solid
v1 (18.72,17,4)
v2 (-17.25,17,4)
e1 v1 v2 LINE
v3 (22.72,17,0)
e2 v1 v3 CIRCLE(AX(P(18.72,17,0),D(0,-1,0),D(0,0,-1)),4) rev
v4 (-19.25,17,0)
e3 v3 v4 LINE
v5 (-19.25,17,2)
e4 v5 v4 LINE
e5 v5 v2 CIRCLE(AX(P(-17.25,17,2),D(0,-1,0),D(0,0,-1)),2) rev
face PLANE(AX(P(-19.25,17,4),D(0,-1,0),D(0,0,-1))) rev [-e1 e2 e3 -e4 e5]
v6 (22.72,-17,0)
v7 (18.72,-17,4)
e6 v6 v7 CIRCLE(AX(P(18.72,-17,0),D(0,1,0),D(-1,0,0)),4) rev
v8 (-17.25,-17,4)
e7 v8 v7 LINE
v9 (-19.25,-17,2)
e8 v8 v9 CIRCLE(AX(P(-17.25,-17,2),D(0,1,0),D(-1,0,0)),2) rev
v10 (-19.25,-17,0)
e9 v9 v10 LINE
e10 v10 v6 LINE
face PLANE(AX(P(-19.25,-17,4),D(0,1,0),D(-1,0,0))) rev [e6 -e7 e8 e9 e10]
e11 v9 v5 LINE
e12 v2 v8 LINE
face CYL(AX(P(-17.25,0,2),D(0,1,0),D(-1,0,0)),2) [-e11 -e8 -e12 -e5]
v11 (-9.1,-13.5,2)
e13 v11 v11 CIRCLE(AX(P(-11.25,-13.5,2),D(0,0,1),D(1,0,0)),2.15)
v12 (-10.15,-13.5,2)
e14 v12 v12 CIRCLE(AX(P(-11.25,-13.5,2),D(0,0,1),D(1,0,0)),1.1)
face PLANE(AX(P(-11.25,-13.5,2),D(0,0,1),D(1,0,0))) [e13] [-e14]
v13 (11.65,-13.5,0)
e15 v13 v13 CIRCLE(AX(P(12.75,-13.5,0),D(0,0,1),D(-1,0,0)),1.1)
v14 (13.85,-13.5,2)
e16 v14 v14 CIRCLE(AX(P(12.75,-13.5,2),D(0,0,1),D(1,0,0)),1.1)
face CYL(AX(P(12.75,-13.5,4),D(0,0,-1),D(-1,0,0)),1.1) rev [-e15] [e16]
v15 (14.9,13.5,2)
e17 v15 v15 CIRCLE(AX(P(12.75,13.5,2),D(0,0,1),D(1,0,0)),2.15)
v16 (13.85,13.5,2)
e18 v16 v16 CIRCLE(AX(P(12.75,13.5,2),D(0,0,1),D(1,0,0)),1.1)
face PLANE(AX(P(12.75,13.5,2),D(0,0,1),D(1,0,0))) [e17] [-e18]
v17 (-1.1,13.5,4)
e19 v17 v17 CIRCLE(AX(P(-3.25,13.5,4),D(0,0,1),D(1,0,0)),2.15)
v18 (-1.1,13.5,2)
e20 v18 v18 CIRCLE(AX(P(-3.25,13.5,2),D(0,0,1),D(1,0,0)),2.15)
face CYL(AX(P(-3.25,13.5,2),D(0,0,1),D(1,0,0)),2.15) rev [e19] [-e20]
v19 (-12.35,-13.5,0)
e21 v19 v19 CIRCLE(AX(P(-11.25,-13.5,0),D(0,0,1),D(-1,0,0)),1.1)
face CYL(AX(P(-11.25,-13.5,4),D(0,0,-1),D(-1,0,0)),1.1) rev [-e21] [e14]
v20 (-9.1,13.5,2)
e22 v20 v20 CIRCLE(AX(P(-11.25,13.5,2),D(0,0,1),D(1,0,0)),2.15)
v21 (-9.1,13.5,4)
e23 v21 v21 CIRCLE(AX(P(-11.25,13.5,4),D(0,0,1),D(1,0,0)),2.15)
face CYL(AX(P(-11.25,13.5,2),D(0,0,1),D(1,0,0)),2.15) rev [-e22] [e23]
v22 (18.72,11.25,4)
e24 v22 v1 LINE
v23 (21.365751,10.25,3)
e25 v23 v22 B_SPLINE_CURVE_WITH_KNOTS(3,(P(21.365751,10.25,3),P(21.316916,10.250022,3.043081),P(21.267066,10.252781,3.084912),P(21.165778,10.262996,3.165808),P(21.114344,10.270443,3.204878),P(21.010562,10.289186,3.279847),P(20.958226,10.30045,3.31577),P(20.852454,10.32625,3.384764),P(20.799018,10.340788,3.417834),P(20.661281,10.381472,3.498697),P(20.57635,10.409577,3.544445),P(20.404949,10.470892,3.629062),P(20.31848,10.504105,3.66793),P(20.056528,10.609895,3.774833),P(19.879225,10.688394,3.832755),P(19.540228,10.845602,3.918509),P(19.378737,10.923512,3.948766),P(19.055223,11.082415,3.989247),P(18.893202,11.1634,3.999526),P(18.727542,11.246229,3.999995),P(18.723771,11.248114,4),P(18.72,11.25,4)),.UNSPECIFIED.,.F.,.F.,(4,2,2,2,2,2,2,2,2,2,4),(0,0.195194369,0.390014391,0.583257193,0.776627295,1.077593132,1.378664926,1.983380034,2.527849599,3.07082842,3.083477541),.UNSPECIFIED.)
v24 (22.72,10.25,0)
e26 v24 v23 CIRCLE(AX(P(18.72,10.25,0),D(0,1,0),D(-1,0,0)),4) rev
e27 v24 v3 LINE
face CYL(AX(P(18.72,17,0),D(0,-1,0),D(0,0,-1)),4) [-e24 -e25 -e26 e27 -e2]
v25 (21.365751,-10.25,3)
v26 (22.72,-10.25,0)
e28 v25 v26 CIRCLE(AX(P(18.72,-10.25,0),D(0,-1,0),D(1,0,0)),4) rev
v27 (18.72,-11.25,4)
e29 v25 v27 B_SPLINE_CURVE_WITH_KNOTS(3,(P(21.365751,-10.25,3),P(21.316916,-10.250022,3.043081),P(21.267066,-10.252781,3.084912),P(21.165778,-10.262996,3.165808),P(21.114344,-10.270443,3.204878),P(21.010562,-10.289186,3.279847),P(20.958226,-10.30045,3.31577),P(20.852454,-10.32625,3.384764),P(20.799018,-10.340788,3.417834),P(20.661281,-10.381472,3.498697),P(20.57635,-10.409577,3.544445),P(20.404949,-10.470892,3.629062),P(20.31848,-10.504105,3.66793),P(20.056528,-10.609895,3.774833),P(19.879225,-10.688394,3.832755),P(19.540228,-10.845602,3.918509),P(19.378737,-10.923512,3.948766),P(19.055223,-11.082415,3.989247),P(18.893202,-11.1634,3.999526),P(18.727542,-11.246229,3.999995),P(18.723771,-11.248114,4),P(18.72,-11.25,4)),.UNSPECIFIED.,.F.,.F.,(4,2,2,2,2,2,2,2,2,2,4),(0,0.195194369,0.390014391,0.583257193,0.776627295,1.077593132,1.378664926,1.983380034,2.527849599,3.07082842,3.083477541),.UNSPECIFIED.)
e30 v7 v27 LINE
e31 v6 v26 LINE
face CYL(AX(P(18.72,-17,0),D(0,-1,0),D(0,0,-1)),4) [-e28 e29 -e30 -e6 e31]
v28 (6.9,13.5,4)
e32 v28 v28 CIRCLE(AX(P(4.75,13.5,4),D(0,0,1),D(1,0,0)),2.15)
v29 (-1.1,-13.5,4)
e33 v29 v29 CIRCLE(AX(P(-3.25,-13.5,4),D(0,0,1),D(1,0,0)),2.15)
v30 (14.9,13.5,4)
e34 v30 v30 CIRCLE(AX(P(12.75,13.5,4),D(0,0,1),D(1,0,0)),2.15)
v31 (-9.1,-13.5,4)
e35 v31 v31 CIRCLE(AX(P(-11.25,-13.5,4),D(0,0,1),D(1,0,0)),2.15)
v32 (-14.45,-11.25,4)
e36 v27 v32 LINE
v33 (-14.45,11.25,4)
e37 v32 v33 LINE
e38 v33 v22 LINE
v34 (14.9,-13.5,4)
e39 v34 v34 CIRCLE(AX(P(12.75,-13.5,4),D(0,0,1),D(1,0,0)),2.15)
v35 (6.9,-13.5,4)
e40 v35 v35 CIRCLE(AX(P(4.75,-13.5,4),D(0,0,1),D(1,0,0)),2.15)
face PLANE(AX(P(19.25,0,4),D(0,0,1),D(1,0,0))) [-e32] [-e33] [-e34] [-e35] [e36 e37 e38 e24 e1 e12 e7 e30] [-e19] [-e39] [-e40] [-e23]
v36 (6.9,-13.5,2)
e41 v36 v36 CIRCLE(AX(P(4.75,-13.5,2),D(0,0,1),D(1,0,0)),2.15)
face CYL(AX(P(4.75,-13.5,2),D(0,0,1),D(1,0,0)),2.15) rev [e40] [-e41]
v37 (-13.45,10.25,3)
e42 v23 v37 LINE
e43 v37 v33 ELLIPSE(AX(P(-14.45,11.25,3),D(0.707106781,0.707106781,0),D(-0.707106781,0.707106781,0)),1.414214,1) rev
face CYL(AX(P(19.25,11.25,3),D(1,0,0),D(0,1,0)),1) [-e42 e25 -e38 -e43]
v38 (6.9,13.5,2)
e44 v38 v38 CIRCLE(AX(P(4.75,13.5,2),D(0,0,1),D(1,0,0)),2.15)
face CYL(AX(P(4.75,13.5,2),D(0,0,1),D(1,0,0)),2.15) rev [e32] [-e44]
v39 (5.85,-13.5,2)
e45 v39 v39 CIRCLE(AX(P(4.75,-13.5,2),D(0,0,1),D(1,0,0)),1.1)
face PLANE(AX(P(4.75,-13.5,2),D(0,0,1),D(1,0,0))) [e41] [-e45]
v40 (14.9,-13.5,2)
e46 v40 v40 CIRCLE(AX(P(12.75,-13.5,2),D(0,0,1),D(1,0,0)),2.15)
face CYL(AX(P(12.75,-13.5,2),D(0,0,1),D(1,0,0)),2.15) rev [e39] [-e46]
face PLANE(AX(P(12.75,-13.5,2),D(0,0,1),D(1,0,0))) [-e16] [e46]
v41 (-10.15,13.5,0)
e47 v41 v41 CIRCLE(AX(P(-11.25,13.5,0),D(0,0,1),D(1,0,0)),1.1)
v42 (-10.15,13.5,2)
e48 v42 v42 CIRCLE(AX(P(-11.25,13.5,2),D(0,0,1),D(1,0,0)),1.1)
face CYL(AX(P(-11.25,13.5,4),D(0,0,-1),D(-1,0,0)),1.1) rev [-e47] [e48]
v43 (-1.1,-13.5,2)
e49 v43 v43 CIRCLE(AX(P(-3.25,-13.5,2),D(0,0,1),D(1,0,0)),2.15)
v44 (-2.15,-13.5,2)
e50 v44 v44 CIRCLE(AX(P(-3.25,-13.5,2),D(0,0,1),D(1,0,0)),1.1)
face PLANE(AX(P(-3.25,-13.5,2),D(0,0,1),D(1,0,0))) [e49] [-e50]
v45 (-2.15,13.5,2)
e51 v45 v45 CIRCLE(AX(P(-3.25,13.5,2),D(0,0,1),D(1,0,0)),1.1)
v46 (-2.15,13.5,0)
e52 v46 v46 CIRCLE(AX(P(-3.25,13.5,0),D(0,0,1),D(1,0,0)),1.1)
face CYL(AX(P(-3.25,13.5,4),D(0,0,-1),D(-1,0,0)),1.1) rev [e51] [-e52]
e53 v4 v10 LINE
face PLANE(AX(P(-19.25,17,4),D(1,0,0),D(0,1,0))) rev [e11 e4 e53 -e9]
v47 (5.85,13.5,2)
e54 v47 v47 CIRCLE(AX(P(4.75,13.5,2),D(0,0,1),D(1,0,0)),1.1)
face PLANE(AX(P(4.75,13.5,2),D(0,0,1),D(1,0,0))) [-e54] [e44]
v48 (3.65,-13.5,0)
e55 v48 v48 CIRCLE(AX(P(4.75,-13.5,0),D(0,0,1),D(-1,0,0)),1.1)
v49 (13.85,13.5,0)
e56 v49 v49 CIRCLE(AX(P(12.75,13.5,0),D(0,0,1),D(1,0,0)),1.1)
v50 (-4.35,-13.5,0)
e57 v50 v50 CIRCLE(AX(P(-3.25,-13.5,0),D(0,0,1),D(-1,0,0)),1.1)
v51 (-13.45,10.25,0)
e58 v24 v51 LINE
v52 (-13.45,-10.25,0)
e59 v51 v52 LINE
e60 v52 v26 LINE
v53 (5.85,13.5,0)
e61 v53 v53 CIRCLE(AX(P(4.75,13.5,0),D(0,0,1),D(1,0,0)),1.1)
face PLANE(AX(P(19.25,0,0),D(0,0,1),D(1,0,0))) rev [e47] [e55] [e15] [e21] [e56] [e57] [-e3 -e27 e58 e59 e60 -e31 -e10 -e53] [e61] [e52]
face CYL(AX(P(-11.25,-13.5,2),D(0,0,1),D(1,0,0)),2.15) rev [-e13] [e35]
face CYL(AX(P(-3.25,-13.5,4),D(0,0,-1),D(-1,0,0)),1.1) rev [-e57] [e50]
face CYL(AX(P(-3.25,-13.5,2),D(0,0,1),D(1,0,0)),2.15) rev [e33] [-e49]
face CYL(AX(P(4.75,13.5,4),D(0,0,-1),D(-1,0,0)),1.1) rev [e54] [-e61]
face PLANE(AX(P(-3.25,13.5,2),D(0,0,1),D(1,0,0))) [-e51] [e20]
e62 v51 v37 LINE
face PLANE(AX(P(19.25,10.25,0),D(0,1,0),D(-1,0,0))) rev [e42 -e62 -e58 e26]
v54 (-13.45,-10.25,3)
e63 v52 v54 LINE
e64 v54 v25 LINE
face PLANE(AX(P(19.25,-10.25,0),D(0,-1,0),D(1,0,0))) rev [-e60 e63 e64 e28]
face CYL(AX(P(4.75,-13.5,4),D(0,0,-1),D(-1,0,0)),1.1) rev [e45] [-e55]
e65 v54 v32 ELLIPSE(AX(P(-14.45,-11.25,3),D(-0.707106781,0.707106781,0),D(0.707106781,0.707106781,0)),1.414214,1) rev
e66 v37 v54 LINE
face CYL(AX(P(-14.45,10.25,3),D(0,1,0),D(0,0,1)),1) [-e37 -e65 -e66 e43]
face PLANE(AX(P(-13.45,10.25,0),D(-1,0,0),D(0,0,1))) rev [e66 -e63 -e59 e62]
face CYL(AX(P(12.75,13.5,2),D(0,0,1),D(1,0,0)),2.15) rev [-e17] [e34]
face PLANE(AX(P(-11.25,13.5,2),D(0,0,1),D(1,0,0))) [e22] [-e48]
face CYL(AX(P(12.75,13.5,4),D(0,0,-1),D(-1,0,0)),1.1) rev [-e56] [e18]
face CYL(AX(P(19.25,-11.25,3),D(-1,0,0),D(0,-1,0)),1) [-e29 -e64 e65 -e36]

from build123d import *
from OCP.BRepFilletAPI import BRepFilletAPI_MakeFillet

# Parameters (mm, degrees)
SKETCH1_R           = 1.1
BOSS_EXTRUDE1_DEPTH = 4
SKETCH2_W           = 32.7
SKETCH2_H           = 20.5
CUT_EXTRUDE1_DEPTH  = 26.991585177
SKETCH3_R           = 2.15
CUT_EXTRUDE2_DEPTH  = 2
SKETCH6_W           = 4
SKETCH6_H           = 6.75
BOSS_EXTRUDE3_DEPTH = 3.47
FILLET1_R           = 4
FILLET1_R_2         = 2
FILLET1_R_3         = 1


with BuildPart() as part:
    # Sketch1 → Boss-Extrude1 (new body)
    with BuildSketch(Plane.XY):
        with BuildLine():
            Line((19.25, 17), (19.25, 5.6))
            ThreePointArc((19.25, 5.6), (13.65, 0), (19.25, -5.6))
            Line((19.25, -5.6), (19.25, -17))
            Line((19.25, -17), (-19.25, -17))
            Line((-19.25, -17), (-19.25, 17))
            Line((-19.25, 17), (19.25, 17))
        make_face()
        with Locations((12.75, 13.5)):
            Circle(SKETCH1_R, mode=Mode.SUBTRACT)
        with Locations((4.75, 13.5)):
            Circle(SKETCH1_R, mode=Mode.SUBTRACT)
        with Locations((-3.25, 13.5)):
            Circle(SKETCH1_R, mode=Mode.SUBTRACT)
        with Locations((-11.25, 13.5)):
            Circle(SKETCH1_R, mode=Mode.SUBTRACT)
        with Locations(Location((-11.25, -13.5, 0), (0, 0, 180))):
            Circle(SKETCH1_R, mode=Mode.SUBTRACT)
        with Locations(Location((-3.25, -13.5, 0), (0, 0, 180))):
            Circle(SKETCH1_R, mode=Mode.SUBTRACT)
        with Locations(Location((4.75, -13.5, 0), (0, 0, 180))):
            Circle(SKETCH1_R, mode=Mode.SUBTRACT)
        with Locations(Location((12.75, -13.5, 0), (0, 0, 180))):
            Circle(SKETCH1_R, mode=Mode.SUBTRACT)
    extrude(amount=BOSS_EXTRUDE1_DEPTH)

    # Sketch2 → Cut-Extrude1 (cut, through all)
    with BuildSketch(Plane.XY.offset(4)):
        with Locations((2.9, 0)):
            Rectangle(SKETCH2_W, SKETCH2_H)
    extrude(amount=-CUT_EXTRUDE1_DEPTH, mode=Mode.SUBTRACT)

    # Sketch3 → Cut-Extrude2 (cut)
    with BuildSketch(Plane.XY.offset(4)):
        with Locations((12.75, 13.5)):
            Circle(SKETCH3_R)
        with Locations((4.75, 13.5)):
            Circle(SKETCH3_R)
        with Locations((-3.25, 13.5)):
            Circle(SKETCH3_R)
        with Locations((-11.25, 13.5)):
            Circle(SKETCH3_R)
        with Locations((12.75, -13.5)):
            Circle(SKETCH3_R)
        with Locations((4.75, -13.5)):
            Circle(SKETCH3_R)
        with Locations((-3.25, -13.5)):
            Circle(SKETCH3_R)
        with Locations((-11.25, -13.5)):
            Circle(SKETCH3_R)
    extrude(amount=-CUT_EXTRUDE2_DEPTH, mode=Mode.SUBTRACT)

    # Sketch6 → Boss-Extrude3 (add)
    with BuildSketch(Plane(origin=(19.25, 0, 0), x_dir=(0, 0, -1), z_dir=(1, 0, 0))):
        with Locations((-2, -13.625)):
            Rectangle(SKETCH6_W, SKETCH6_H)
        with Locations((-2, 13.625)):
            Rectangle(SKETCH6_W, SKETCH6_H)
    extrude(amount=BOSS_EXTRUDE3_DEPTH)

    # Fillet1
    fillet1_edges_1 = [part.edges().sort_by_distance(p)[0] for p in [
        (22.72, 13.625, 4),
        (22.72, -13.625, 4),
    ]]
    fillet1_edges_2 = [part.edges().sort_by_distance(p)[0] for p in [
        (-19.25, 0, 4),
    ]]
    fillet1_edges_3 = [part.edges().sort_by_distance(p)[0] for p in [
        (4.635, 10.25, 4),
        (4.635, -10.25, 4),
        (-13.45, 0, 4),
    ]]
    fillet1 = BRepFilletAPI_MakeFillet(part.part.solid().wrapped)
    for e in fillet1_edges_1:
        fillet1.Add(FILLET1_R - 0.0001, e.wrapped)
    for e in fillet1_edges_2:
        fillet1.Add(FILLET1_R_2 - 0.0001, e.wrapped)
    for e in fillet1_edges_3:
        fillet1.Add(FILLET1_R_3 - 0.0001, e.wrapped)
    add(Compound.cast(fillet1.Shape()), mode=Mode.REPLACE)  # a hair under: the kernel refuses the full size


solid = part.part
